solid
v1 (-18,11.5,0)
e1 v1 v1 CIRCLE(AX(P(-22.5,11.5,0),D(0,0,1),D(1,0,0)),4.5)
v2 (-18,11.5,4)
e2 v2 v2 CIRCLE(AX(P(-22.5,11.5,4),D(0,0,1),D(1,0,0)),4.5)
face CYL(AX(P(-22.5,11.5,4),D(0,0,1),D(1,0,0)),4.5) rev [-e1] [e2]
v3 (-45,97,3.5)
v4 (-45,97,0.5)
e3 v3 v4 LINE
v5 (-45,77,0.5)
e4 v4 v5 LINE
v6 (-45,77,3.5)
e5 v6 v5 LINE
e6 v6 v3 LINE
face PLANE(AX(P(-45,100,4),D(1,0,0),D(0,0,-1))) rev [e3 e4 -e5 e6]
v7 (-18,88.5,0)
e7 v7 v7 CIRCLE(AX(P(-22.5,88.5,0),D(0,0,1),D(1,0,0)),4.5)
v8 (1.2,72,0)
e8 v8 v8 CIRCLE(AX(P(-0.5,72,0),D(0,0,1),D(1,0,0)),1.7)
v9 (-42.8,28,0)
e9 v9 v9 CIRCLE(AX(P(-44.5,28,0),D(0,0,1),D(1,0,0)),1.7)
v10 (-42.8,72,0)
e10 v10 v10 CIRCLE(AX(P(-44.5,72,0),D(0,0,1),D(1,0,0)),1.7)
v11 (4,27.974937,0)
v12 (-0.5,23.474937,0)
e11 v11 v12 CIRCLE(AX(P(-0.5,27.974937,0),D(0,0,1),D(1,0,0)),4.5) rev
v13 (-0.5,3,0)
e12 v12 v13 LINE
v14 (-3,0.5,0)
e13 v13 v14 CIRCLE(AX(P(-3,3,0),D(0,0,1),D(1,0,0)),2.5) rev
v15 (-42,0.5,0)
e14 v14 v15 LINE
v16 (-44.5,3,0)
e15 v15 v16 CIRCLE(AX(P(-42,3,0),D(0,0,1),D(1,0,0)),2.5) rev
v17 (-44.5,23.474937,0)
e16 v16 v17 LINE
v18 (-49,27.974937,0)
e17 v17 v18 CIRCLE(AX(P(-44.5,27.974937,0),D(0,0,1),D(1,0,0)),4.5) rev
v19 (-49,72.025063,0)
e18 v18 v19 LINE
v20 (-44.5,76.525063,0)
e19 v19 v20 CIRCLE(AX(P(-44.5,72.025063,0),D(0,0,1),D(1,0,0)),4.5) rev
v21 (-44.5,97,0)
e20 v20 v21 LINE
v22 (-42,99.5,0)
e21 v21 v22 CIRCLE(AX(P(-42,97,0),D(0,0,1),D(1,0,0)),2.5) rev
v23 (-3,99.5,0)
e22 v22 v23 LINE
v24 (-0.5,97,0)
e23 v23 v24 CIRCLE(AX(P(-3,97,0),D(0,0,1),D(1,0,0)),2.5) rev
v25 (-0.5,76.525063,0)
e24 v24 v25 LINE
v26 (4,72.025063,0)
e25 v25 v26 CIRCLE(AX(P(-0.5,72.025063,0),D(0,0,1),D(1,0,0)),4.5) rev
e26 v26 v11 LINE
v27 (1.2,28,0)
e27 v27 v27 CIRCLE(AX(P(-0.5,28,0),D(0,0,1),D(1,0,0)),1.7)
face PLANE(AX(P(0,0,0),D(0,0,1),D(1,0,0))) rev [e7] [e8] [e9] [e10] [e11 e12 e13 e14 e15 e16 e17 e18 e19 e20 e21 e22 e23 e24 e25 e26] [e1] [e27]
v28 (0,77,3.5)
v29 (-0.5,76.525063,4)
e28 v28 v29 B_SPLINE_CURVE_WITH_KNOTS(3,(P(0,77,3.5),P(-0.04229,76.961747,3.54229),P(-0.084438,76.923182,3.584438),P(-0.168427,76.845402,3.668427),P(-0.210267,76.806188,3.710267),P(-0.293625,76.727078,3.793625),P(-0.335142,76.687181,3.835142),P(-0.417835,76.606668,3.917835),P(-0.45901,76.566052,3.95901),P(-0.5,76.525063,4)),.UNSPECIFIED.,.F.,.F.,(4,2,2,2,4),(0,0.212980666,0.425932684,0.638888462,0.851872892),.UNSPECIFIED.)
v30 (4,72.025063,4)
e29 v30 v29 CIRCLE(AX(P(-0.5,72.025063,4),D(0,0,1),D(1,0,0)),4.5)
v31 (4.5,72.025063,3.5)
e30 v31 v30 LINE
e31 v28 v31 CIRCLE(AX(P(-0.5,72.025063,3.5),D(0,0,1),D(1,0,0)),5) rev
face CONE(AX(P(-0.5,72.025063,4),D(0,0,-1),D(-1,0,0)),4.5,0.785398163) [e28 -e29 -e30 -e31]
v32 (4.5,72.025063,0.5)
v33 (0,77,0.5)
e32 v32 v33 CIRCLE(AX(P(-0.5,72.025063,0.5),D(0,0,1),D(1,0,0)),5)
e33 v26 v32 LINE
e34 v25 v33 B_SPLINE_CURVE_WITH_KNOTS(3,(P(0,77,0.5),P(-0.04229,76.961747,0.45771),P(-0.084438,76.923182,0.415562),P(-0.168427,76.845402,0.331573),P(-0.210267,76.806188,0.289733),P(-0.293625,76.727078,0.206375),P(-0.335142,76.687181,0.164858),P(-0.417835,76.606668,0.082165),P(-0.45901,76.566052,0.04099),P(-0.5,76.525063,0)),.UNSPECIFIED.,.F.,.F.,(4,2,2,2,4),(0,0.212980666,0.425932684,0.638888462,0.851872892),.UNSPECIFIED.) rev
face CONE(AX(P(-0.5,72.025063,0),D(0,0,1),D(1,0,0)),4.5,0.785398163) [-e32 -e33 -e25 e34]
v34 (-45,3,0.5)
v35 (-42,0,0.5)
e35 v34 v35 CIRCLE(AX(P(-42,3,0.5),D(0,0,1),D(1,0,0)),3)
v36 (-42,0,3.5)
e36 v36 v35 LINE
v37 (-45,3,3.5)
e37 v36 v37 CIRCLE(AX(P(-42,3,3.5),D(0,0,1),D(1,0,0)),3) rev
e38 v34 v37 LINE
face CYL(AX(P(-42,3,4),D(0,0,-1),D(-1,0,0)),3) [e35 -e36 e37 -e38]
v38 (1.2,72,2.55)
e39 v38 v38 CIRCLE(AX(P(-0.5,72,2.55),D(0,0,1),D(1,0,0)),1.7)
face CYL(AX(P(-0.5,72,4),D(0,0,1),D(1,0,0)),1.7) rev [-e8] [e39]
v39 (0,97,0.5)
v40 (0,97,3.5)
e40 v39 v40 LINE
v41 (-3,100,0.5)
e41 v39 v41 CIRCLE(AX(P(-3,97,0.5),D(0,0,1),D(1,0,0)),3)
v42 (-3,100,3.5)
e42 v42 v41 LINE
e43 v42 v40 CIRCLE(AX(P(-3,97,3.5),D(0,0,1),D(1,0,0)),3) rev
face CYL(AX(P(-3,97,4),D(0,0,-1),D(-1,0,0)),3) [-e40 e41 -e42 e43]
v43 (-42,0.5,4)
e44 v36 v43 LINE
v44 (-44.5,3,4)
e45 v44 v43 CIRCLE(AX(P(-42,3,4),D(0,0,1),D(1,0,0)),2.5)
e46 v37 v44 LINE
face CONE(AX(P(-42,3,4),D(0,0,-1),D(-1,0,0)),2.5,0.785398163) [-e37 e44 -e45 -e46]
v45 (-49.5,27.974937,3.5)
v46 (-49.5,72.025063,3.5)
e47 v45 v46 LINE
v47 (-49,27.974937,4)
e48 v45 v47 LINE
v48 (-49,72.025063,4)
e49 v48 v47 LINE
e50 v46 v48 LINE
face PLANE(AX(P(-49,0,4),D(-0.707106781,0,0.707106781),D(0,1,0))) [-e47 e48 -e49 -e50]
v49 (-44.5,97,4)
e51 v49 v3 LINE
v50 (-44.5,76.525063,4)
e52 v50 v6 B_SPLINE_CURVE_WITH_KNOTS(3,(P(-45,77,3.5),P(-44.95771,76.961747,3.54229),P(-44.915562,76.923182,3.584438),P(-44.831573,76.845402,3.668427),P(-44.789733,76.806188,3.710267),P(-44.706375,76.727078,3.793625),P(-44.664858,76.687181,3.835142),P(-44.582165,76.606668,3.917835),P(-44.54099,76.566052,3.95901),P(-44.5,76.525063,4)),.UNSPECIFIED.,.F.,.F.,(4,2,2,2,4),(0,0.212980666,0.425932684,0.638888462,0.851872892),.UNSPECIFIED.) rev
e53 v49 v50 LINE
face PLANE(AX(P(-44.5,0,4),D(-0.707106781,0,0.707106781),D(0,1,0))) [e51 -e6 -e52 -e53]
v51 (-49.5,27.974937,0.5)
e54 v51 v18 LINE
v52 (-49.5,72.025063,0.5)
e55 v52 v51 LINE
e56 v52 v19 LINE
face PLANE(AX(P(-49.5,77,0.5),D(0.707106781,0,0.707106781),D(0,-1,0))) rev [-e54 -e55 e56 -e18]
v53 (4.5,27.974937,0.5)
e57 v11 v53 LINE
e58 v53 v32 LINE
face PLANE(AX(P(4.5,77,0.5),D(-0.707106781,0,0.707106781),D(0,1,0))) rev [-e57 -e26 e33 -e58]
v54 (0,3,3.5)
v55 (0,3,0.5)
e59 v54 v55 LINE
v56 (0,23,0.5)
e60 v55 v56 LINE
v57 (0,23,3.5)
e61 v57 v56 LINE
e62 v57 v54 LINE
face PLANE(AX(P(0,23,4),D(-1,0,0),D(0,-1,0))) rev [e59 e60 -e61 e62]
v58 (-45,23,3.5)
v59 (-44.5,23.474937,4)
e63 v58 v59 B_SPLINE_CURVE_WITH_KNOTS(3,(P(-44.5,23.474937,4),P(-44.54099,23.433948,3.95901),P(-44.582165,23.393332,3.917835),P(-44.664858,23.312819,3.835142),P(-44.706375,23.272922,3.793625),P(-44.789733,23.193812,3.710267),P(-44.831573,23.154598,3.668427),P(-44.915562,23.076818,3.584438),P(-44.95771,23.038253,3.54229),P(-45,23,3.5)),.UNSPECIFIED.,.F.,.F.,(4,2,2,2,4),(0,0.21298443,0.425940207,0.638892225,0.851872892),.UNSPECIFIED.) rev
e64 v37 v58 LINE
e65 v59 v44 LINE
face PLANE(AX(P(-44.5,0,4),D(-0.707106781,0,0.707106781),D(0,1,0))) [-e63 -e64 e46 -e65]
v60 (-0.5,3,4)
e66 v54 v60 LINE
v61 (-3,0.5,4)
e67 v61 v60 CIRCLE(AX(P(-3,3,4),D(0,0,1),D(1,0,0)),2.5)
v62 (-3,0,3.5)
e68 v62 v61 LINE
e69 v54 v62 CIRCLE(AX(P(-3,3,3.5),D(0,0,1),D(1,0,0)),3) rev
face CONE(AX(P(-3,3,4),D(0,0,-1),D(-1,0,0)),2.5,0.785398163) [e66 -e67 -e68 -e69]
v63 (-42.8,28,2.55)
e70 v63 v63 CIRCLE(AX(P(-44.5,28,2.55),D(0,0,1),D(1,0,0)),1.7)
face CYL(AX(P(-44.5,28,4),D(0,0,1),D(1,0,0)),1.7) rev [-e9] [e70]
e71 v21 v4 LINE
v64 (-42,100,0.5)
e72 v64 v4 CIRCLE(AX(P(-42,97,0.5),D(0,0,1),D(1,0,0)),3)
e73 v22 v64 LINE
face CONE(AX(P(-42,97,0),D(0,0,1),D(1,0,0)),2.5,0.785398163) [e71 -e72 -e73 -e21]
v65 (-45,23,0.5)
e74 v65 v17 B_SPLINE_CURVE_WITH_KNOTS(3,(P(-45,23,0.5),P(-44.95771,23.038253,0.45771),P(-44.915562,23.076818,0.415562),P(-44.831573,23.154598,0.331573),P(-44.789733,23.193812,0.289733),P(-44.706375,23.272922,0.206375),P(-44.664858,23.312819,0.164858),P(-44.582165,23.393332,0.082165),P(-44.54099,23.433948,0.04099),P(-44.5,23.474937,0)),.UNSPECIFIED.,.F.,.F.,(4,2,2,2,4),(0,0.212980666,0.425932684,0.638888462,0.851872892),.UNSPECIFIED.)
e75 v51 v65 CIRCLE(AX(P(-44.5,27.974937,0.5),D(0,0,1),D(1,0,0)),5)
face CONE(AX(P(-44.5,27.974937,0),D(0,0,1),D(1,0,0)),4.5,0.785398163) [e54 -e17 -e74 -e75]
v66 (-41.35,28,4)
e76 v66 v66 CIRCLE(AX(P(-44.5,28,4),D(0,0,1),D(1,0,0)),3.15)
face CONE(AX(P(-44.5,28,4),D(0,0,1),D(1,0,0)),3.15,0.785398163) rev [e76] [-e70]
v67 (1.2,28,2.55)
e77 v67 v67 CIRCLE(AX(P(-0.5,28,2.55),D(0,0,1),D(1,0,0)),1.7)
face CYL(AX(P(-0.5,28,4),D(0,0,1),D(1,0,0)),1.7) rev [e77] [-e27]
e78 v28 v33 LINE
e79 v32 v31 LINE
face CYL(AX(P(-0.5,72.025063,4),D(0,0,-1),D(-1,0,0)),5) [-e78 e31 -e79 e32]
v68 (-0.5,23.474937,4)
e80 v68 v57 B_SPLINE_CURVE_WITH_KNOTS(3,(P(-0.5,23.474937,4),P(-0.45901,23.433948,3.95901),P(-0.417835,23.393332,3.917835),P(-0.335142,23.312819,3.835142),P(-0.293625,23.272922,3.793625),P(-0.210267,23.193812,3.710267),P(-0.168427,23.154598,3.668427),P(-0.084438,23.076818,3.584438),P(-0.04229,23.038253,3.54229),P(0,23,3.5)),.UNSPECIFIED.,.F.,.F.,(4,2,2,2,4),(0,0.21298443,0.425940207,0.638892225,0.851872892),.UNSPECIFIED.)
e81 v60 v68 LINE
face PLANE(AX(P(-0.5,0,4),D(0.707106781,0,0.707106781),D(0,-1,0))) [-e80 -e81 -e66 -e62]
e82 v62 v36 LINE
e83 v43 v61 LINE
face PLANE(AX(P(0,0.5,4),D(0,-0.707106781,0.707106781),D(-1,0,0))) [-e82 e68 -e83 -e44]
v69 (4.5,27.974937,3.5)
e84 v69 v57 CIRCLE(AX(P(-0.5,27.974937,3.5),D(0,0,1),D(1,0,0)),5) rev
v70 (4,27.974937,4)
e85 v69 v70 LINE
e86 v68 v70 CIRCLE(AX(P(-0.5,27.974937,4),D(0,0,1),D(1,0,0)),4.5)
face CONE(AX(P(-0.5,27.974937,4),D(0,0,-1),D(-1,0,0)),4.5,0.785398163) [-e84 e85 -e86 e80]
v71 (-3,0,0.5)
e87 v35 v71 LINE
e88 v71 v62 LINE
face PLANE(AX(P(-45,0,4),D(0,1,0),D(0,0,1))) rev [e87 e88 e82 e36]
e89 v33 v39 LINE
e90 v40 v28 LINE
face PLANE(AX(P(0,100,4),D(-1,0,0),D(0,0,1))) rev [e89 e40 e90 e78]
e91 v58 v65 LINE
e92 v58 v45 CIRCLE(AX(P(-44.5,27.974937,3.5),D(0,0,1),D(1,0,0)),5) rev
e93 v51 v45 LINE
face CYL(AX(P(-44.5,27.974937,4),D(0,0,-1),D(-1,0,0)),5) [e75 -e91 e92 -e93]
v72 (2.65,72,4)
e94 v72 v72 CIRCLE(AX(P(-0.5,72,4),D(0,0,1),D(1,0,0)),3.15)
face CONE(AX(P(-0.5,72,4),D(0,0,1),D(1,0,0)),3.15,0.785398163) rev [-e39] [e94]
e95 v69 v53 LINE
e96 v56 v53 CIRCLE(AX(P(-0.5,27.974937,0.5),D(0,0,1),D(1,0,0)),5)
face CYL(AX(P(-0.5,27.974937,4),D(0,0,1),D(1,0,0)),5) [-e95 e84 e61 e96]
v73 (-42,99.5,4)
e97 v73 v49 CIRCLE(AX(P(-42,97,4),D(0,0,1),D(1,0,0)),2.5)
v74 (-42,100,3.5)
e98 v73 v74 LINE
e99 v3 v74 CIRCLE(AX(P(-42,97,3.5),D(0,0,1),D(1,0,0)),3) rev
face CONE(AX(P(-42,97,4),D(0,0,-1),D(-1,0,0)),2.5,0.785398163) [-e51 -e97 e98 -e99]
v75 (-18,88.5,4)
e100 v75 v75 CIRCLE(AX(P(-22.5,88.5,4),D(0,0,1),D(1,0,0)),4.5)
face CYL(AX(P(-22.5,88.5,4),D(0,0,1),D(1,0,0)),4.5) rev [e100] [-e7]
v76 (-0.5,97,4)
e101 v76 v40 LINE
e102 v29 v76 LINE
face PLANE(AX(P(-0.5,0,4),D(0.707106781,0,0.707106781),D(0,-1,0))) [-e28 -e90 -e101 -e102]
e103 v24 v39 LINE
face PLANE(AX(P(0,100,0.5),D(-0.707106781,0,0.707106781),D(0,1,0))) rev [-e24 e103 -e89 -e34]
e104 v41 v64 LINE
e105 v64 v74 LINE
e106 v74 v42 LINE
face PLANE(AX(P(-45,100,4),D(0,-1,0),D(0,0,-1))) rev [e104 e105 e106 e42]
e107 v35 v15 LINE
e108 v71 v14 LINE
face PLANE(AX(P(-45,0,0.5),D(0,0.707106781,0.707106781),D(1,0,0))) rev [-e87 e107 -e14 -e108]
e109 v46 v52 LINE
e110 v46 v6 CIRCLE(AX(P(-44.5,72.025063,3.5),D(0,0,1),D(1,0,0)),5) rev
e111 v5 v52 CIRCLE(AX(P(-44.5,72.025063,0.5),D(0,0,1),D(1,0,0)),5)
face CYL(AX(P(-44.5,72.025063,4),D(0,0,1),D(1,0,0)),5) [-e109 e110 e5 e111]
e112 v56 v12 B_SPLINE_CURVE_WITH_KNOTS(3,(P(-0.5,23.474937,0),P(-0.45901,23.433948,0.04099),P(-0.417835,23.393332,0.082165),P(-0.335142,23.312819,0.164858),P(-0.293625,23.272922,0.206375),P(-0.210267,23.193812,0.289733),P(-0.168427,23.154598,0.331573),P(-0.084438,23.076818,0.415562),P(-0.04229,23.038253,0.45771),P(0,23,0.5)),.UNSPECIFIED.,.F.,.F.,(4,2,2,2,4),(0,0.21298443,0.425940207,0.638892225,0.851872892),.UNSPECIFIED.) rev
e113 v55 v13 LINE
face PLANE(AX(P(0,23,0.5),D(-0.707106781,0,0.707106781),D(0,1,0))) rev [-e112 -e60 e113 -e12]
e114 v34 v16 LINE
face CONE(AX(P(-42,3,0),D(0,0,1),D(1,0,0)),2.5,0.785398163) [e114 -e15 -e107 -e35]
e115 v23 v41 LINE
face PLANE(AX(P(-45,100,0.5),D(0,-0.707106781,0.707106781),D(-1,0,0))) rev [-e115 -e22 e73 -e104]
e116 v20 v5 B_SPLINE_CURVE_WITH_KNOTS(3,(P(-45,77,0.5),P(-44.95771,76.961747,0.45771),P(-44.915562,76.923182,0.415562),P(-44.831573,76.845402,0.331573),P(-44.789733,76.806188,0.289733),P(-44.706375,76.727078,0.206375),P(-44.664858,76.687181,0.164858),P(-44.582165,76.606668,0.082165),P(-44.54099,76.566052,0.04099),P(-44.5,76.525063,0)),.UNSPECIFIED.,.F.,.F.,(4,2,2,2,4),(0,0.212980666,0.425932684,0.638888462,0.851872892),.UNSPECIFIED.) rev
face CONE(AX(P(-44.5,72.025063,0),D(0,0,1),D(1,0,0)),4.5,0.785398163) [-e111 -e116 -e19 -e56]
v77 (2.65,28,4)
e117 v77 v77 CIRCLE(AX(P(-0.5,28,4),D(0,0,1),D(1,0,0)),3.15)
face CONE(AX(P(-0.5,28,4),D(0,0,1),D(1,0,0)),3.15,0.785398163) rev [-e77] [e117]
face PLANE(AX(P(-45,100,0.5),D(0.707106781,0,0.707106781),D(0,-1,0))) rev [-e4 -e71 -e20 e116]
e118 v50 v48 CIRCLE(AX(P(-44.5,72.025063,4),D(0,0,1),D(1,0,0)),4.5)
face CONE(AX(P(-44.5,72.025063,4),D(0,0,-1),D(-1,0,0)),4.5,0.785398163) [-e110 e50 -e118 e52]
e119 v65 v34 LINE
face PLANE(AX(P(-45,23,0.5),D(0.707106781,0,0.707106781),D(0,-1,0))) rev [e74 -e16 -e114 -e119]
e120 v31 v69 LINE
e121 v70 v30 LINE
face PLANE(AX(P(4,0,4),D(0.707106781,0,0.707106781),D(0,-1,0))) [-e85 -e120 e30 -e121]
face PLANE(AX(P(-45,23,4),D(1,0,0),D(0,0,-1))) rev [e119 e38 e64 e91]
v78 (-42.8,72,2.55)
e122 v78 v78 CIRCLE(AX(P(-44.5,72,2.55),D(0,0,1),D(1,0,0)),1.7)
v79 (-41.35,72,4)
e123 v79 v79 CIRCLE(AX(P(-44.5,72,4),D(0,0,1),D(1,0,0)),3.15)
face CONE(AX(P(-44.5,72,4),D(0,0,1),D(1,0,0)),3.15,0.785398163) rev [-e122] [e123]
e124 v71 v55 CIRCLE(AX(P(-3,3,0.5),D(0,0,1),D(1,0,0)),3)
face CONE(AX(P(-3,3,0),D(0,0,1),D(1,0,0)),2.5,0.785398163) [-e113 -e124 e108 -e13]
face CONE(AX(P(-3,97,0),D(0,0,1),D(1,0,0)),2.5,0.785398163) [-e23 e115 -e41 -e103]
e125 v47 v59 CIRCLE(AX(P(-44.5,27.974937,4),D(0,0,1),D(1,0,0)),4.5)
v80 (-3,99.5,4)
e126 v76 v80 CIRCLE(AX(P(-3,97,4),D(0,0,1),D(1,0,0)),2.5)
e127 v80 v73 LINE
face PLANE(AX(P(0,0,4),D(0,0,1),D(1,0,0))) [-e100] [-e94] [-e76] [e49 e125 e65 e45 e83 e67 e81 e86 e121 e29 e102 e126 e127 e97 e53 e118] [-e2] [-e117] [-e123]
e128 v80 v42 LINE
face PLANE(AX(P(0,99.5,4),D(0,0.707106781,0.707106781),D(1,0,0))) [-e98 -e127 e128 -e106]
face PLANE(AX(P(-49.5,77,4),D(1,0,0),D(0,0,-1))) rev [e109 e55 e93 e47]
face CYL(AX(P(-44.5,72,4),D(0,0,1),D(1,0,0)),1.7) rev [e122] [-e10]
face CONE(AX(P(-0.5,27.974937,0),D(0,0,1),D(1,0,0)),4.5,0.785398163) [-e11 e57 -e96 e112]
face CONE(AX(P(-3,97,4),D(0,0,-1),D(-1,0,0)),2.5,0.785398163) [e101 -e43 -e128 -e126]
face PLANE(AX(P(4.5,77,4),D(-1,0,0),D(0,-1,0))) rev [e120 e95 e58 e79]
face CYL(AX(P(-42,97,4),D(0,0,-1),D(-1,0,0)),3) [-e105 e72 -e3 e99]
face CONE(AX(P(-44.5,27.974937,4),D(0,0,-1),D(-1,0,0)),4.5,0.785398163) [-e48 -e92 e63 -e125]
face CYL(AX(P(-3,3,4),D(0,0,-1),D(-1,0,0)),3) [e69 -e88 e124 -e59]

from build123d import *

# Parameters (mm, degrees)
BOSS_EXTRU_1_DEPTH                             = 4
FRAISAGE_POUR_VIS_T_TE_FRAIS_E_M31_D           = 3.4
FRAISAGE_POUR_VIS_T_TE_FRAIS_E_M31_CSINK_D     = 6.3
FRAISAGE_POUR_VIS_T_TE_FRAIS_E_M31_CSINK_ANGLE = 90
CONG_1_R                                       = 5
D_GAGEMENT_M81_D                               = 9
CONG_2_R                                       = 3
CHANFREIN1_SIZE                                = 0.5
CHANFREIN2_SIZE                                = 0.5


with BuildPart() as part:
    # Esquisse1 → Boss.-Extru.1 (new body)
    with BuildSketch(Plane.XY):
        Polygon((0, 77), (4.5, 77), (4.5, 23), (0, 23), (0, 0), (-45, 0), (-45, 23), (-49.5, 23), (-49.5, 77), (-45, 77), (-45, 100), (0, 100), align=None)
    extrude(amount=BOSS_EXTRU_1_DEPTH)

    # Fraisage pour vis à tête fraisée M31 (through all)
    with Locations(Plane.XY.offset(4)):
        with Locations((-44.5, 72), (-0.5, 72), (-0.5, 28), (-44.5, 28)):
            CounterSinkHole(FRAISAGE_POUR_VIS_T_TE_FRAIS_E_M31_D / 2, FRAISAGE_POUR_VIS_T_TE_FRAIS_E_M31_CSINK_D / 2, counter_sink_angle=FRAISAGE_POUR_VIS_T_TE_FRAIS_E_M31_CSINK_ANGLE)

    # Congé1
    # the kernel refuses this fillet: 5 mm, written as the material it takes off along each edge
    with BuildSketch(Plane(origin=(-49.5, 23, -12.437342964), x_dir=(0, 1, 0), z_dir=(0, 0, 1))) as cong_1_piece_1:
        with BuildLine():
            CenterArc((4.974937186, -5), CONG_1_R, 90, 84.260829523)
            Line((0, -4.5), (-0.099498744, -4.49))
            ThreePointArc((-0.099498744, -4.49), (-0.1, -2.25), (-0.1, 0))
            Line((-0.1, 0), (0, 0.1))
            Line((0, 0.1), (4.974937186, 0.1))
            Line((4.974937186, 0.1), (4.974937186, 0))
        make_face()
    extrude(amount=28.874685928, mode=Mode.SUBTRACT)
    with BuildSketch(Plane(origin=(-49.5, 77, -12.437342964), x_dir=(1, 0, 0), z_dir=(0, 0, 1)), Plane(origin=(4.5, 23, -12.437342964), x_dir=(-1, 0, 0), z_dir=(0, 0, 1))) as cong_1_piece_2:
        with BuildLine():
            CenterArc((5, -4.974937186), CONG_1_R, 95.739170477, 84.260829523)
            Line((0, -4.974937186), (-0.1, -4.974937186))
            Line((-0.1, -4.974937186), (-0.1, 0))
            Line((-0.1, 0), (0, 0.1))
            ThreePointArc((0, 0.1), (2.25, 0.1), (4.49, 0.099498744))
            Line((4.49, 0.099498744), (4.5, 0))
        make_face()
    extrude(amount=28.874685928, mode=Mode.SUBTRACT)
    with BuildSketch(Plane(origin=(4.5, 77, -12.437342964), x_dir=(-1, 0, 0), z_dir=(0, 0, 1))) as cong_1_piece_3:
        with BuildLine():
            CenterArc((5, 4.974937186), CONG_1_R, 180, 84.260829523)
            Line((0, 4.974937186), (-0.1, 4.974937186))
            Line((-0.1, 4.974937186), (-0.1, 0))
            Line((-0.1, 0), (0, -0.1))
            ThreePointArc((0, -0.1), (2.25, -0.1), (4.49, -0.099498744))
            Line((4.49, -0.099498744), (4.5, 0))
        make_face()
    extrude(amount=28.874685928, mode=Mode.SUBTRACT)

    # Dégagement M81 (through all)
    with Locations(Plane.XY.offset(4)):
        with Locations((-22.5, 88.5), (-22.5, 11.5)):
            Hole(D_GAGEMENT_M81_D / 2)

    # Congé2
    cong_2_edges = [part.edges().sort_by_distance(p)[0] for p in [
        (-45, 100, 2),
        (0, 100, 2),
        (0, 0, 2),
        (-45, 0, 2),
    ]]
    fillet(cong_2_edges, radius=CONG_2_R)

    # Chanfrein1
    chanfrein1_edges = [part.edges().sort_by_distance(p)[0] for p in [
        (0, 87, 0),
        (-45, 13, 0),
        (-49.5, 50, 0),
        (4.5, 50, 0),
        (3.208099244, 24.620835219, 0),
        (-48.208099244, 75.379164781, 0),
        (-48.208099244, 24.620835219, 0),
        (3.208099244, 75.379164781, 0),
        (4.5, 50, 4),
        (3.208099244, 24.620835219, 4),
        (3.208099244, 75.379164781, 4),
        (0, 13, 0),
        (-22.5, 0, 0),
        (-45, 87, 0),
        (-22.5, 100, 0),
        (-0.878679656, 99.121320344, 0),
        (-44.121320344, 99.121320344, 0),
        (-44.121320344, 0.878679656, 0),
        (-0.878679656, 0.878679656, 0),
    ]]
    chamfer(chanfrein1_edges, length=CHANFREIN1_SIZE)

    # Chanfrein2
    chanfrein2_edges = [part.edges().sort_by_distance(p)[0] for p in [
        (0, 86.748599385, 4),
        (-0.878679656, 99.121320344, 4),
        (-22.5, 100, 4),
        (-44.121320344, 99.121320344, 4),
        (-45, 87, 4),
        (-45, 13, 4),
        (-44.121320344, 0.878679656, 4),
        (-22.5, 0, 4),
        (-0.878679656, 0.878679656, 4),
        (0, 13.251400615, 4),
        (-48.208099244, 75.379164781, 4),
        (-48.208099244, 24.620835219, 4),
        (-49.5, 50, 4),
    ]]
    chamfer(chanfrein2_edges, length=CHANFREIN2_SIZE)


solid = part.part
